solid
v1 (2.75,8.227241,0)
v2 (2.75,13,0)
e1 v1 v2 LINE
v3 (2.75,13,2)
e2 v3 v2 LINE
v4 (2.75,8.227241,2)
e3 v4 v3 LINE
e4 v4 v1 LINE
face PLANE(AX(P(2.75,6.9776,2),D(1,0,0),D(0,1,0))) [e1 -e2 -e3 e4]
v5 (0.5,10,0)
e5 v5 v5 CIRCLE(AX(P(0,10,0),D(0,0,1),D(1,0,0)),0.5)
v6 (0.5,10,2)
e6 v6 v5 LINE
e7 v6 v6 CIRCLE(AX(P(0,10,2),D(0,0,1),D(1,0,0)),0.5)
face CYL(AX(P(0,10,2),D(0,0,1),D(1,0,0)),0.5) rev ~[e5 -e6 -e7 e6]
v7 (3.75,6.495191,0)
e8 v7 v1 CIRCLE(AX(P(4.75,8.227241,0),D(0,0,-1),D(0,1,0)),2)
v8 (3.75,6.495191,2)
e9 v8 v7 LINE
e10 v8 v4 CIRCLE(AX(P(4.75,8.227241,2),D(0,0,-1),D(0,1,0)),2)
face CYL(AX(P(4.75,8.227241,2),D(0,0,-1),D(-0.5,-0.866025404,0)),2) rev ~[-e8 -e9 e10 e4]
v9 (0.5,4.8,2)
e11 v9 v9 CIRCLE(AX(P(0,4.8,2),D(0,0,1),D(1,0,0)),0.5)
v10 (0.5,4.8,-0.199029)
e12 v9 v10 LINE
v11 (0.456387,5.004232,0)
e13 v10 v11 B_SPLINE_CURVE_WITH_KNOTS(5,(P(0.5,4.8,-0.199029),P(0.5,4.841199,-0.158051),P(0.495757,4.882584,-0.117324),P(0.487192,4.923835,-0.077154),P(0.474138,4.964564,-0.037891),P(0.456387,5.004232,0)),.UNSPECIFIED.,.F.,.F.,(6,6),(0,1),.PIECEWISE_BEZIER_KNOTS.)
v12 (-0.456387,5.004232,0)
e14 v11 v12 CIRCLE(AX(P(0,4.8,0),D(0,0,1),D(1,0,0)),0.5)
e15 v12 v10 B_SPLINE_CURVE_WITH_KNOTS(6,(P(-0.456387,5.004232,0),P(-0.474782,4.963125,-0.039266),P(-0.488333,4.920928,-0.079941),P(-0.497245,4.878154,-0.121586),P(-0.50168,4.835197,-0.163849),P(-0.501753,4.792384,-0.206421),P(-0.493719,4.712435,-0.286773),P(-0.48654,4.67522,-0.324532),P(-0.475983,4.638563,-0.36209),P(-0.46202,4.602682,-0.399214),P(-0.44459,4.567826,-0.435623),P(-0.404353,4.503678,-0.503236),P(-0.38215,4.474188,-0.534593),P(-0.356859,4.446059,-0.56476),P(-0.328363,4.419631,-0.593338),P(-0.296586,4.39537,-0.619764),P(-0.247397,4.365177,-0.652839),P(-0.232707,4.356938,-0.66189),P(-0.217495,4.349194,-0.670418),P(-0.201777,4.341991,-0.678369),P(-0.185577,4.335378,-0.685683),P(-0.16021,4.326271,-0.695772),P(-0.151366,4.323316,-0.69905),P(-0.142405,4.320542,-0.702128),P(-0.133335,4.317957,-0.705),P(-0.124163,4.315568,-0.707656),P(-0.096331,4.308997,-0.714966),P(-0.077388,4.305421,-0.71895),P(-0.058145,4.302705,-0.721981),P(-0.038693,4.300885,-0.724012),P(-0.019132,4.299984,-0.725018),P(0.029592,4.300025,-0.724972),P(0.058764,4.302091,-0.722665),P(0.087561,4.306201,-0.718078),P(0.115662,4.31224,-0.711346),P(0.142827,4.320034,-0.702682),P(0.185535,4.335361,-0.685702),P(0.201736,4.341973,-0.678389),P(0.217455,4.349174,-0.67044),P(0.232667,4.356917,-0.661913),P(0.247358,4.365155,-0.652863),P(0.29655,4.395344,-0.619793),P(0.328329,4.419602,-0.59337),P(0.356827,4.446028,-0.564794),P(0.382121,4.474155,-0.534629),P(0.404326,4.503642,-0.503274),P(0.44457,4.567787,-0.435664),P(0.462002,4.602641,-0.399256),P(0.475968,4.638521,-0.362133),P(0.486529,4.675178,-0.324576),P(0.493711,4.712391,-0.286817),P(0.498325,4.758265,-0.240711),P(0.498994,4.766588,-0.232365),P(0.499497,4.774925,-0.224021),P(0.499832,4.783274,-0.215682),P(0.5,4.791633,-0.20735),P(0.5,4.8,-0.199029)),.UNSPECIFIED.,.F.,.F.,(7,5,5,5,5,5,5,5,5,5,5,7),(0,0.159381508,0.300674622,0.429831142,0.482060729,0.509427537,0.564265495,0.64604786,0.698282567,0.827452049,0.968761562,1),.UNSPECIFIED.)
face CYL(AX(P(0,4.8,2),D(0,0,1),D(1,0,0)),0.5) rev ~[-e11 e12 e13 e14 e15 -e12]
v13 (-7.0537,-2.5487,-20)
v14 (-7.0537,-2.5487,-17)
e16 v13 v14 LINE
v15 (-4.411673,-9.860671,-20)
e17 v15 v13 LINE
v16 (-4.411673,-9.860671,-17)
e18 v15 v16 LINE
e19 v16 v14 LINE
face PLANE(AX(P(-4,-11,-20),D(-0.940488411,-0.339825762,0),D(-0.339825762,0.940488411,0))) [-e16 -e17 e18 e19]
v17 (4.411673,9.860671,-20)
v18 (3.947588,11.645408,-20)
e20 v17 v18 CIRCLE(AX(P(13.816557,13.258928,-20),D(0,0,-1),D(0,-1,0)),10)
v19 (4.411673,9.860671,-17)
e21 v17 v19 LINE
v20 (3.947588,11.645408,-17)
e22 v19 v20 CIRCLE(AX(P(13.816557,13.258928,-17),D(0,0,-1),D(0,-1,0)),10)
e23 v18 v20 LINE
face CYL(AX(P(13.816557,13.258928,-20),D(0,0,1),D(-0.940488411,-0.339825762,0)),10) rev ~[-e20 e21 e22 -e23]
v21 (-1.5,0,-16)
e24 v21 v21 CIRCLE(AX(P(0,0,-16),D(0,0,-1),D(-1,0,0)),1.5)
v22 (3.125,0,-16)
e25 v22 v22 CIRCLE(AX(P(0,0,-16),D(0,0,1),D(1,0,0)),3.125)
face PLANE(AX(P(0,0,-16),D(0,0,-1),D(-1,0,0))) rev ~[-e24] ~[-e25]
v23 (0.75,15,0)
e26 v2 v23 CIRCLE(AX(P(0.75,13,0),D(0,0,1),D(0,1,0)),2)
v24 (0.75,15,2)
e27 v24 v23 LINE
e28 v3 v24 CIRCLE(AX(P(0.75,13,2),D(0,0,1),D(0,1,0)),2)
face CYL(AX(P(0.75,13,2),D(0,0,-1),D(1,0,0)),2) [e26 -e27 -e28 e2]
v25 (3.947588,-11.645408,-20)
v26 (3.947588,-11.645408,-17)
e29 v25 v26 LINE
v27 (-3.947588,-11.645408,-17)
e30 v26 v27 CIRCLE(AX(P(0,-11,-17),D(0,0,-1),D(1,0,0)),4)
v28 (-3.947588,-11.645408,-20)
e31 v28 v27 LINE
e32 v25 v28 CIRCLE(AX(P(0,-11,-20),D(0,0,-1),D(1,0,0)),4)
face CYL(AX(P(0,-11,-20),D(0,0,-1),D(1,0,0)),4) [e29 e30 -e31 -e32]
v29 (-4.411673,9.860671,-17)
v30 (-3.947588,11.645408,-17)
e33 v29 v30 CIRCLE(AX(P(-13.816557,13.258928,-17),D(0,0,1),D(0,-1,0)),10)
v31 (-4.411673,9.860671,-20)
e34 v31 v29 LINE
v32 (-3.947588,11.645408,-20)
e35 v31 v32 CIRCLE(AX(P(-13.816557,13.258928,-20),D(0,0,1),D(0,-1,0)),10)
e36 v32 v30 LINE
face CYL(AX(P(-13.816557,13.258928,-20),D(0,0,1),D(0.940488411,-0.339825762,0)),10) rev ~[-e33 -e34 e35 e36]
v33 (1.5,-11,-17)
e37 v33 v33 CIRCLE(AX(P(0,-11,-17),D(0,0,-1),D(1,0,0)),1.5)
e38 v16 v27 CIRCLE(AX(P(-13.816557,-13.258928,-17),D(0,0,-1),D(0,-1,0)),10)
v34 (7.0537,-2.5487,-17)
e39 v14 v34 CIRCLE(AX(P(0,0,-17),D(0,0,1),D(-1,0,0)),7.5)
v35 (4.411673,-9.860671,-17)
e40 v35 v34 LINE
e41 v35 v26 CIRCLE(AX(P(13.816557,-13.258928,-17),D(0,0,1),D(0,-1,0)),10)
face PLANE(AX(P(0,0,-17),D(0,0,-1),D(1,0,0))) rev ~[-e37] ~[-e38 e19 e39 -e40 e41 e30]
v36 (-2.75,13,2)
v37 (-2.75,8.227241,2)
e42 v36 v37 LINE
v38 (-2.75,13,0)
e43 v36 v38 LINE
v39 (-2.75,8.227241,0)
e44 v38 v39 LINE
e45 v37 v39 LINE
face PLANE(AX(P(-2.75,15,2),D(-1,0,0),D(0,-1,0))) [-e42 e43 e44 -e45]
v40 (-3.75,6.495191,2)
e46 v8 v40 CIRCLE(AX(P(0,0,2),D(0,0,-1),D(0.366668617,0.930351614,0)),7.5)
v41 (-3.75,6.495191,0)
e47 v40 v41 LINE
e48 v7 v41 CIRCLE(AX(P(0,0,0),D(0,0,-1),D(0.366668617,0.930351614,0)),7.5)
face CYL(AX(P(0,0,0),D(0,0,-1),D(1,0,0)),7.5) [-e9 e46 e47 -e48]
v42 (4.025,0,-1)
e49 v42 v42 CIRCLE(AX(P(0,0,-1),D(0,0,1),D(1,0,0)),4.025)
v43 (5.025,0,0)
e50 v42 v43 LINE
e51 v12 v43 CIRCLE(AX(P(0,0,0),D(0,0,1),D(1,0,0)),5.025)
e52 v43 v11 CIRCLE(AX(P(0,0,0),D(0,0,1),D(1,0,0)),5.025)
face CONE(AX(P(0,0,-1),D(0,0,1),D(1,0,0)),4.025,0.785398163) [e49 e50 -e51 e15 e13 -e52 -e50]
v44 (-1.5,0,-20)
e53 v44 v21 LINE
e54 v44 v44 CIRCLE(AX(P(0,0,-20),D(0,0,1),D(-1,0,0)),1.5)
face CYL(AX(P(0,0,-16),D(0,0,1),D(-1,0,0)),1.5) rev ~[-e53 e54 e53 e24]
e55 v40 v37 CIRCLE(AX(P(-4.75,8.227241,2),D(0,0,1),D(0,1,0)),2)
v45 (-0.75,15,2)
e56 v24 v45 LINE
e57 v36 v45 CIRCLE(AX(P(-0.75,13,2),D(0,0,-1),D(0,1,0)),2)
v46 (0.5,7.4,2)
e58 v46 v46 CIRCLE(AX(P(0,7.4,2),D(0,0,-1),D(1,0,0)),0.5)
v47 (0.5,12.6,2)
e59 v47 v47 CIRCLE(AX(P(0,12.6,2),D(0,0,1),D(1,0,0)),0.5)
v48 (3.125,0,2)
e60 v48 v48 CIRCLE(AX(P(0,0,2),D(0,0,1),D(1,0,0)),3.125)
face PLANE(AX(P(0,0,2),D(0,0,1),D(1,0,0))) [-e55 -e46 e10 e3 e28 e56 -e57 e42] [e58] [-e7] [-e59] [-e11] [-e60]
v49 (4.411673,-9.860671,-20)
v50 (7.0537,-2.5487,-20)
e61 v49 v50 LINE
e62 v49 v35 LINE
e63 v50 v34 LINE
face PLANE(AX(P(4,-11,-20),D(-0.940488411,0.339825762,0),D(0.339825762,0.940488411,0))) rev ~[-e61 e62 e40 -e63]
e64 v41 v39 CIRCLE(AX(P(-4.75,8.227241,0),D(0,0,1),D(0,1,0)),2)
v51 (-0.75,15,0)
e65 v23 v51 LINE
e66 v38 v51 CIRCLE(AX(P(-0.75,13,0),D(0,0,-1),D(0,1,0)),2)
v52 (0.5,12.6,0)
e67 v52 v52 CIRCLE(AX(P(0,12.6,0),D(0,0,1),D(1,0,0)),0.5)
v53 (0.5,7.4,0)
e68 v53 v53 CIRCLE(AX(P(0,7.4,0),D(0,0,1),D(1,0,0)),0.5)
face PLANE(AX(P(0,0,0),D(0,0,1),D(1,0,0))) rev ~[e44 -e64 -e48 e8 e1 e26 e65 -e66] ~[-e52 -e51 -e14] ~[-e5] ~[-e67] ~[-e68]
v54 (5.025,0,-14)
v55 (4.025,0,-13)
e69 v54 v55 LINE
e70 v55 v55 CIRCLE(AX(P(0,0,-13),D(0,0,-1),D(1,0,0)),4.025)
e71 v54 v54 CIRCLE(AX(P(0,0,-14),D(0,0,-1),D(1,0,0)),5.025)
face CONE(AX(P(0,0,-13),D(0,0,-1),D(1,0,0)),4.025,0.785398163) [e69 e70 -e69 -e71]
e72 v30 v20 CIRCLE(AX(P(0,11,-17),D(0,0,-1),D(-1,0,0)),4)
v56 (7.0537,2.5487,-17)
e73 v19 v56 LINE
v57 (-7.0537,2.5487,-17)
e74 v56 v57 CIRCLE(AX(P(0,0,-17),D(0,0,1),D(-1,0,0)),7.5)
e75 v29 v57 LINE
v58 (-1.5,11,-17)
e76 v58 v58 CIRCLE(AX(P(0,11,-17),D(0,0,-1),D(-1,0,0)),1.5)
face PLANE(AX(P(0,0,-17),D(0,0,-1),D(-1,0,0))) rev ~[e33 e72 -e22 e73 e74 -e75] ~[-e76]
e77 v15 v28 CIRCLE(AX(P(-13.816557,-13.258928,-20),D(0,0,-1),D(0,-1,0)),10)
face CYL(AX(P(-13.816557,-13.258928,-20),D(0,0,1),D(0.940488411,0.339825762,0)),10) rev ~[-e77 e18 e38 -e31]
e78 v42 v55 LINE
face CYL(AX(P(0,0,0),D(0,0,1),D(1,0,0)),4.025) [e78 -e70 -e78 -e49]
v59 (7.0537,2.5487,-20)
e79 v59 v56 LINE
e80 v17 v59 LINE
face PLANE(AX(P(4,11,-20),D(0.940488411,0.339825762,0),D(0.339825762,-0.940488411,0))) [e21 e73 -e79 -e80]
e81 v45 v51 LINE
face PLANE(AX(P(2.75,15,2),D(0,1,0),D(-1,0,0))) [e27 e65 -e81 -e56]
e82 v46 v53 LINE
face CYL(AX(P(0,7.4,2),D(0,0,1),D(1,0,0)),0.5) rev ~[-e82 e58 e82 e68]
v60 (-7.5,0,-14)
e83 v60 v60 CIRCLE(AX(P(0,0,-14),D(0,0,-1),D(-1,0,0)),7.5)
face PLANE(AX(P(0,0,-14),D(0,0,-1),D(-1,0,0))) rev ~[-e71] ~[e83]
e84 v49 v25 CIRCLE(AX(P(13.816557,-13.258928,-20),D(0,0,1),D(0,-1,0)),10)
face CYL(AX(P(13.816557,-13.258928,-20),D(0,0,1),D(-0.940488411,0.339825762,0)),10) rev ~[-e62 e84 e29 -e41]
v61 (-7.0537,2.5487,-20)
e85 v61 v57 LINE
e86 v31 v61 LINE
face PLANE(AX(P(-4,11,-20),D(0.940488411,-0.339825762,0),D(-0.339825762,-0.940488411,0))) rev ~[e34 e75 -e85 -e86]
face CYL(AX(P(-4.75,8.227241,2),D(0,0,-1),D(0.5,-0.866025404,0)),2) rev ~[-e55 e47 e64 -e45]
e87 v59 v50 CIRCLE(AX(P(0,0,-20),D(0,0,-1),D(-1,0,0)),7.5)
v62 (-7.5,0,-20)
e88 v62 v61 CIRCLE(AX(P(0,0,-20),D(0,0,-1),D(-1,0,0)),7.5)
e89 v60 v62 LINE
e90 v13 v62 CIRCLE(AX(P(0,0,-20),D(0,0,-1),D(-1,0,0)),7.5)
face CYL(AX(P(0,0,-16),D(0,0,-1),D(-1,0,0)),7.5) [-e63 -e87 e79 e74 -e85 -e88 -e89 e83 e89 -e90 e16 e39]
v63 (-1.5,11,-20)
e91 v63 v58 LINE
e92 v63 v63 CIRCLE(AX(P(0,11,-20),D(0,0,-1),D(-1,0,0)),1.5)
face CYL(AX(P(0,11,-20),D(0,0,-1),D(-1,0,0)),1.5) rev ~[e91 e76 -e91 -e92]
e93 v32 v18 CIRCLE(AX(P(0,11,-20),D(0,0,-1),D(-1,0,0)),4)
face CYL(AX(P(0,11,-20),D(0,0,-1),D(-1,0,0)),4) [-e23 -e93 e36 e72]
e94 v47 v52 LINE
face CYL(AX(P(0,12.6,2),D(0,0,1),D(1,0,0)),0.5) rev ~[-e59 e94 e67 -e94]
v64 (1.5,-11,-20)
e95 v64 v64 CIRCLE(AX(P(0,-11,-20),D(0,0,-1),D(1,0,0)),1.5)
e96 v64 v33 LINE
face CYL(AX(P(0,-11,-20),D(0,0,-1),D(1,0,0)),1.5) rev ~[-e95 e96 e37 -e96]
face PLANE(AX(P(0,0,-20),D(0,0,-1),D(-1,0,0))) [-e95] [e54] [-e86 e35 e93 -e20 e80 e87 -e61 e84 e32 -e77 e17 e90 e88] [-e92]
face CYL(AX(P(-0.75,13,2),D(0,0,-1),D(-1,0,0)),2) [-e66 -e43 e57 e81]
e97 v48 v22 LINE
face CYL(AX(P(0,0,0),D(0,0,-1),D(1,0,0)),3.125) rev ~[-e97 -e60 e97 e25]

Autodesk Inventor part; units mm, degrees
ref_plane "YZ Plane" through (0, 0, 0) normal (1, 0, 0) x (0, 1, 0)
ref_plane "XZ Plane" through (0, 0, 0) normal (0, 1, 0) x (-1, 0, 0)
ref_plane "XY Plane" through (0, 0, 0) normal (0, 0, 1) x (1, 0, 0)
sketch "Sketch1" plane through (0, 0, 0) normal (0, 0, 1) x (1, 0, 0)
  circle A0 centre (0, 0) radius 3.125
  circle A1 centre (0, 0) radius 4.025
  circle A2 centre (0, 0) radius 7.5
  dimension "d0" = 6.25
  dimension "d1" = 0.9
  dimension "d2" = 15
extrude "Extrusion1" add sketch "Sketch1" along normal blind 2 contours A1 | A2
extrude "Extrusion2" add sketch "Sketch1" against normal blind 16 contours A1
sketch "Sketch2" plane through (0, 0, -16) normal (0, 0, -1) x (-1, 0, 0)
  circle A0 centre (0, 0) radius 4.025 projected
  circle A1 centre (0, 0) radius 7.5 projected
  circle A2 centre (0, 0) radius 3.125 projected
  circle A3 centre (0, 0) radius 1.5
  dimension "d9" = 3
extrude "Extrusion3" add sketch "Sketch2" along normal blind 4 contours A0 | A1 | A2
sketch "Sketch3" plane through (0, 0, -20) normal (0, 0, -1) x (-1, 0, 0)
  circle A0 centre (0, 0) radius 1.5 projected
  circle A1 centre (0, 0) radius 7.5 projected
  circle A2 centre (0, 11) radius 1.5
  circle A3 centre (0, 11) radius 4
  circle A4 centre (0, 0) radius 7.5 projected
  line L0 (4, 11) -> (7.0537, 2.5487)
  line L1 (-4, 11) -> (-7.0537, 2.5487)
  dimension "d10" = 3
  dimension "d11" = 11
  dimension "d12" = 8
  dimension "d41" = 0
extrude "Extrusion4" add sketch "Sketch3" against normal blind 3
pattern_circular "Circular Pattern1" count 2 over 360 about axis through (0, 0, -16) along (0, 0, -1) of "Extrusion4"
extrude "Extrusion5" add sketch "Sketch2" against normal blind 2 contours A1
fillet "Fillet1" radius 10 4 edges at (-4, 11, -18.5) (4, 11, -18.5) (-4, -11, -18.5) (4, -11, -18.5)
chamfer "Chamfer1" distance 1 angle 45 2 edges at (-4.025, 0, -14) (-4.025, 0, 0)
sketch "Sketch4" plane through (0, 0, 2) normal (0, 0, 1) x (1, 0, 0)
  circle A0 centre (0, 0) radius 3.125 projected
  circle A1 centre (0, 0) radius 7.5 projected
  circle A2 centre (0, 0) radius 7.5 projected
  line L0 (2.75, 6.9776) -> (2.75, 15)
  line L1 (2.75, 15) -> (-2.75, 15)
  line L2 (-2.75, 15) -> (-2.75, 6.9776)
  circle A3 centre (0, 4.8) radius 0.5
  circle A4 centre (0, 7.4) radius 0.5
  circle A5 centre (0, 10) radius 0.5
  circle A6 centre (0, 12.6) radius 0.5
  circle A7 centre (0, 0) radius 4.025 projected
  dimension "d24" = 2.75
  dimension "d25" = 2.75
  dimension "d26" = 7.5
  dimension "d27" = 1
  dimension "d28" = 4.8
  dimension "d31" = 2.6
extrude "Extrusion6" add sketch "Sketch4" against normal blind 2 contours A1 A4 L2 L1 L0 | A1 A4 picked at (0, 7.6321)
extrude "Extrusion7" cut sketch "Sketch4" against normal blind 3 contours A4 A1 | A1 A4 | A3 picked at (-0.014, 7.2994) picked at (0, 7.6321)
fillet "Fillet2" radius 2 4 edges at (2.75, 6.9776, 1) (-2.75, 6.9776, 1) (-2.75, 15, 1) (2.75, 15, 1)
equation "\"d25\" = d24"
properties part number "3DP_ABS_Solenoid_Actuator_Body" material "ABS Plastic"
